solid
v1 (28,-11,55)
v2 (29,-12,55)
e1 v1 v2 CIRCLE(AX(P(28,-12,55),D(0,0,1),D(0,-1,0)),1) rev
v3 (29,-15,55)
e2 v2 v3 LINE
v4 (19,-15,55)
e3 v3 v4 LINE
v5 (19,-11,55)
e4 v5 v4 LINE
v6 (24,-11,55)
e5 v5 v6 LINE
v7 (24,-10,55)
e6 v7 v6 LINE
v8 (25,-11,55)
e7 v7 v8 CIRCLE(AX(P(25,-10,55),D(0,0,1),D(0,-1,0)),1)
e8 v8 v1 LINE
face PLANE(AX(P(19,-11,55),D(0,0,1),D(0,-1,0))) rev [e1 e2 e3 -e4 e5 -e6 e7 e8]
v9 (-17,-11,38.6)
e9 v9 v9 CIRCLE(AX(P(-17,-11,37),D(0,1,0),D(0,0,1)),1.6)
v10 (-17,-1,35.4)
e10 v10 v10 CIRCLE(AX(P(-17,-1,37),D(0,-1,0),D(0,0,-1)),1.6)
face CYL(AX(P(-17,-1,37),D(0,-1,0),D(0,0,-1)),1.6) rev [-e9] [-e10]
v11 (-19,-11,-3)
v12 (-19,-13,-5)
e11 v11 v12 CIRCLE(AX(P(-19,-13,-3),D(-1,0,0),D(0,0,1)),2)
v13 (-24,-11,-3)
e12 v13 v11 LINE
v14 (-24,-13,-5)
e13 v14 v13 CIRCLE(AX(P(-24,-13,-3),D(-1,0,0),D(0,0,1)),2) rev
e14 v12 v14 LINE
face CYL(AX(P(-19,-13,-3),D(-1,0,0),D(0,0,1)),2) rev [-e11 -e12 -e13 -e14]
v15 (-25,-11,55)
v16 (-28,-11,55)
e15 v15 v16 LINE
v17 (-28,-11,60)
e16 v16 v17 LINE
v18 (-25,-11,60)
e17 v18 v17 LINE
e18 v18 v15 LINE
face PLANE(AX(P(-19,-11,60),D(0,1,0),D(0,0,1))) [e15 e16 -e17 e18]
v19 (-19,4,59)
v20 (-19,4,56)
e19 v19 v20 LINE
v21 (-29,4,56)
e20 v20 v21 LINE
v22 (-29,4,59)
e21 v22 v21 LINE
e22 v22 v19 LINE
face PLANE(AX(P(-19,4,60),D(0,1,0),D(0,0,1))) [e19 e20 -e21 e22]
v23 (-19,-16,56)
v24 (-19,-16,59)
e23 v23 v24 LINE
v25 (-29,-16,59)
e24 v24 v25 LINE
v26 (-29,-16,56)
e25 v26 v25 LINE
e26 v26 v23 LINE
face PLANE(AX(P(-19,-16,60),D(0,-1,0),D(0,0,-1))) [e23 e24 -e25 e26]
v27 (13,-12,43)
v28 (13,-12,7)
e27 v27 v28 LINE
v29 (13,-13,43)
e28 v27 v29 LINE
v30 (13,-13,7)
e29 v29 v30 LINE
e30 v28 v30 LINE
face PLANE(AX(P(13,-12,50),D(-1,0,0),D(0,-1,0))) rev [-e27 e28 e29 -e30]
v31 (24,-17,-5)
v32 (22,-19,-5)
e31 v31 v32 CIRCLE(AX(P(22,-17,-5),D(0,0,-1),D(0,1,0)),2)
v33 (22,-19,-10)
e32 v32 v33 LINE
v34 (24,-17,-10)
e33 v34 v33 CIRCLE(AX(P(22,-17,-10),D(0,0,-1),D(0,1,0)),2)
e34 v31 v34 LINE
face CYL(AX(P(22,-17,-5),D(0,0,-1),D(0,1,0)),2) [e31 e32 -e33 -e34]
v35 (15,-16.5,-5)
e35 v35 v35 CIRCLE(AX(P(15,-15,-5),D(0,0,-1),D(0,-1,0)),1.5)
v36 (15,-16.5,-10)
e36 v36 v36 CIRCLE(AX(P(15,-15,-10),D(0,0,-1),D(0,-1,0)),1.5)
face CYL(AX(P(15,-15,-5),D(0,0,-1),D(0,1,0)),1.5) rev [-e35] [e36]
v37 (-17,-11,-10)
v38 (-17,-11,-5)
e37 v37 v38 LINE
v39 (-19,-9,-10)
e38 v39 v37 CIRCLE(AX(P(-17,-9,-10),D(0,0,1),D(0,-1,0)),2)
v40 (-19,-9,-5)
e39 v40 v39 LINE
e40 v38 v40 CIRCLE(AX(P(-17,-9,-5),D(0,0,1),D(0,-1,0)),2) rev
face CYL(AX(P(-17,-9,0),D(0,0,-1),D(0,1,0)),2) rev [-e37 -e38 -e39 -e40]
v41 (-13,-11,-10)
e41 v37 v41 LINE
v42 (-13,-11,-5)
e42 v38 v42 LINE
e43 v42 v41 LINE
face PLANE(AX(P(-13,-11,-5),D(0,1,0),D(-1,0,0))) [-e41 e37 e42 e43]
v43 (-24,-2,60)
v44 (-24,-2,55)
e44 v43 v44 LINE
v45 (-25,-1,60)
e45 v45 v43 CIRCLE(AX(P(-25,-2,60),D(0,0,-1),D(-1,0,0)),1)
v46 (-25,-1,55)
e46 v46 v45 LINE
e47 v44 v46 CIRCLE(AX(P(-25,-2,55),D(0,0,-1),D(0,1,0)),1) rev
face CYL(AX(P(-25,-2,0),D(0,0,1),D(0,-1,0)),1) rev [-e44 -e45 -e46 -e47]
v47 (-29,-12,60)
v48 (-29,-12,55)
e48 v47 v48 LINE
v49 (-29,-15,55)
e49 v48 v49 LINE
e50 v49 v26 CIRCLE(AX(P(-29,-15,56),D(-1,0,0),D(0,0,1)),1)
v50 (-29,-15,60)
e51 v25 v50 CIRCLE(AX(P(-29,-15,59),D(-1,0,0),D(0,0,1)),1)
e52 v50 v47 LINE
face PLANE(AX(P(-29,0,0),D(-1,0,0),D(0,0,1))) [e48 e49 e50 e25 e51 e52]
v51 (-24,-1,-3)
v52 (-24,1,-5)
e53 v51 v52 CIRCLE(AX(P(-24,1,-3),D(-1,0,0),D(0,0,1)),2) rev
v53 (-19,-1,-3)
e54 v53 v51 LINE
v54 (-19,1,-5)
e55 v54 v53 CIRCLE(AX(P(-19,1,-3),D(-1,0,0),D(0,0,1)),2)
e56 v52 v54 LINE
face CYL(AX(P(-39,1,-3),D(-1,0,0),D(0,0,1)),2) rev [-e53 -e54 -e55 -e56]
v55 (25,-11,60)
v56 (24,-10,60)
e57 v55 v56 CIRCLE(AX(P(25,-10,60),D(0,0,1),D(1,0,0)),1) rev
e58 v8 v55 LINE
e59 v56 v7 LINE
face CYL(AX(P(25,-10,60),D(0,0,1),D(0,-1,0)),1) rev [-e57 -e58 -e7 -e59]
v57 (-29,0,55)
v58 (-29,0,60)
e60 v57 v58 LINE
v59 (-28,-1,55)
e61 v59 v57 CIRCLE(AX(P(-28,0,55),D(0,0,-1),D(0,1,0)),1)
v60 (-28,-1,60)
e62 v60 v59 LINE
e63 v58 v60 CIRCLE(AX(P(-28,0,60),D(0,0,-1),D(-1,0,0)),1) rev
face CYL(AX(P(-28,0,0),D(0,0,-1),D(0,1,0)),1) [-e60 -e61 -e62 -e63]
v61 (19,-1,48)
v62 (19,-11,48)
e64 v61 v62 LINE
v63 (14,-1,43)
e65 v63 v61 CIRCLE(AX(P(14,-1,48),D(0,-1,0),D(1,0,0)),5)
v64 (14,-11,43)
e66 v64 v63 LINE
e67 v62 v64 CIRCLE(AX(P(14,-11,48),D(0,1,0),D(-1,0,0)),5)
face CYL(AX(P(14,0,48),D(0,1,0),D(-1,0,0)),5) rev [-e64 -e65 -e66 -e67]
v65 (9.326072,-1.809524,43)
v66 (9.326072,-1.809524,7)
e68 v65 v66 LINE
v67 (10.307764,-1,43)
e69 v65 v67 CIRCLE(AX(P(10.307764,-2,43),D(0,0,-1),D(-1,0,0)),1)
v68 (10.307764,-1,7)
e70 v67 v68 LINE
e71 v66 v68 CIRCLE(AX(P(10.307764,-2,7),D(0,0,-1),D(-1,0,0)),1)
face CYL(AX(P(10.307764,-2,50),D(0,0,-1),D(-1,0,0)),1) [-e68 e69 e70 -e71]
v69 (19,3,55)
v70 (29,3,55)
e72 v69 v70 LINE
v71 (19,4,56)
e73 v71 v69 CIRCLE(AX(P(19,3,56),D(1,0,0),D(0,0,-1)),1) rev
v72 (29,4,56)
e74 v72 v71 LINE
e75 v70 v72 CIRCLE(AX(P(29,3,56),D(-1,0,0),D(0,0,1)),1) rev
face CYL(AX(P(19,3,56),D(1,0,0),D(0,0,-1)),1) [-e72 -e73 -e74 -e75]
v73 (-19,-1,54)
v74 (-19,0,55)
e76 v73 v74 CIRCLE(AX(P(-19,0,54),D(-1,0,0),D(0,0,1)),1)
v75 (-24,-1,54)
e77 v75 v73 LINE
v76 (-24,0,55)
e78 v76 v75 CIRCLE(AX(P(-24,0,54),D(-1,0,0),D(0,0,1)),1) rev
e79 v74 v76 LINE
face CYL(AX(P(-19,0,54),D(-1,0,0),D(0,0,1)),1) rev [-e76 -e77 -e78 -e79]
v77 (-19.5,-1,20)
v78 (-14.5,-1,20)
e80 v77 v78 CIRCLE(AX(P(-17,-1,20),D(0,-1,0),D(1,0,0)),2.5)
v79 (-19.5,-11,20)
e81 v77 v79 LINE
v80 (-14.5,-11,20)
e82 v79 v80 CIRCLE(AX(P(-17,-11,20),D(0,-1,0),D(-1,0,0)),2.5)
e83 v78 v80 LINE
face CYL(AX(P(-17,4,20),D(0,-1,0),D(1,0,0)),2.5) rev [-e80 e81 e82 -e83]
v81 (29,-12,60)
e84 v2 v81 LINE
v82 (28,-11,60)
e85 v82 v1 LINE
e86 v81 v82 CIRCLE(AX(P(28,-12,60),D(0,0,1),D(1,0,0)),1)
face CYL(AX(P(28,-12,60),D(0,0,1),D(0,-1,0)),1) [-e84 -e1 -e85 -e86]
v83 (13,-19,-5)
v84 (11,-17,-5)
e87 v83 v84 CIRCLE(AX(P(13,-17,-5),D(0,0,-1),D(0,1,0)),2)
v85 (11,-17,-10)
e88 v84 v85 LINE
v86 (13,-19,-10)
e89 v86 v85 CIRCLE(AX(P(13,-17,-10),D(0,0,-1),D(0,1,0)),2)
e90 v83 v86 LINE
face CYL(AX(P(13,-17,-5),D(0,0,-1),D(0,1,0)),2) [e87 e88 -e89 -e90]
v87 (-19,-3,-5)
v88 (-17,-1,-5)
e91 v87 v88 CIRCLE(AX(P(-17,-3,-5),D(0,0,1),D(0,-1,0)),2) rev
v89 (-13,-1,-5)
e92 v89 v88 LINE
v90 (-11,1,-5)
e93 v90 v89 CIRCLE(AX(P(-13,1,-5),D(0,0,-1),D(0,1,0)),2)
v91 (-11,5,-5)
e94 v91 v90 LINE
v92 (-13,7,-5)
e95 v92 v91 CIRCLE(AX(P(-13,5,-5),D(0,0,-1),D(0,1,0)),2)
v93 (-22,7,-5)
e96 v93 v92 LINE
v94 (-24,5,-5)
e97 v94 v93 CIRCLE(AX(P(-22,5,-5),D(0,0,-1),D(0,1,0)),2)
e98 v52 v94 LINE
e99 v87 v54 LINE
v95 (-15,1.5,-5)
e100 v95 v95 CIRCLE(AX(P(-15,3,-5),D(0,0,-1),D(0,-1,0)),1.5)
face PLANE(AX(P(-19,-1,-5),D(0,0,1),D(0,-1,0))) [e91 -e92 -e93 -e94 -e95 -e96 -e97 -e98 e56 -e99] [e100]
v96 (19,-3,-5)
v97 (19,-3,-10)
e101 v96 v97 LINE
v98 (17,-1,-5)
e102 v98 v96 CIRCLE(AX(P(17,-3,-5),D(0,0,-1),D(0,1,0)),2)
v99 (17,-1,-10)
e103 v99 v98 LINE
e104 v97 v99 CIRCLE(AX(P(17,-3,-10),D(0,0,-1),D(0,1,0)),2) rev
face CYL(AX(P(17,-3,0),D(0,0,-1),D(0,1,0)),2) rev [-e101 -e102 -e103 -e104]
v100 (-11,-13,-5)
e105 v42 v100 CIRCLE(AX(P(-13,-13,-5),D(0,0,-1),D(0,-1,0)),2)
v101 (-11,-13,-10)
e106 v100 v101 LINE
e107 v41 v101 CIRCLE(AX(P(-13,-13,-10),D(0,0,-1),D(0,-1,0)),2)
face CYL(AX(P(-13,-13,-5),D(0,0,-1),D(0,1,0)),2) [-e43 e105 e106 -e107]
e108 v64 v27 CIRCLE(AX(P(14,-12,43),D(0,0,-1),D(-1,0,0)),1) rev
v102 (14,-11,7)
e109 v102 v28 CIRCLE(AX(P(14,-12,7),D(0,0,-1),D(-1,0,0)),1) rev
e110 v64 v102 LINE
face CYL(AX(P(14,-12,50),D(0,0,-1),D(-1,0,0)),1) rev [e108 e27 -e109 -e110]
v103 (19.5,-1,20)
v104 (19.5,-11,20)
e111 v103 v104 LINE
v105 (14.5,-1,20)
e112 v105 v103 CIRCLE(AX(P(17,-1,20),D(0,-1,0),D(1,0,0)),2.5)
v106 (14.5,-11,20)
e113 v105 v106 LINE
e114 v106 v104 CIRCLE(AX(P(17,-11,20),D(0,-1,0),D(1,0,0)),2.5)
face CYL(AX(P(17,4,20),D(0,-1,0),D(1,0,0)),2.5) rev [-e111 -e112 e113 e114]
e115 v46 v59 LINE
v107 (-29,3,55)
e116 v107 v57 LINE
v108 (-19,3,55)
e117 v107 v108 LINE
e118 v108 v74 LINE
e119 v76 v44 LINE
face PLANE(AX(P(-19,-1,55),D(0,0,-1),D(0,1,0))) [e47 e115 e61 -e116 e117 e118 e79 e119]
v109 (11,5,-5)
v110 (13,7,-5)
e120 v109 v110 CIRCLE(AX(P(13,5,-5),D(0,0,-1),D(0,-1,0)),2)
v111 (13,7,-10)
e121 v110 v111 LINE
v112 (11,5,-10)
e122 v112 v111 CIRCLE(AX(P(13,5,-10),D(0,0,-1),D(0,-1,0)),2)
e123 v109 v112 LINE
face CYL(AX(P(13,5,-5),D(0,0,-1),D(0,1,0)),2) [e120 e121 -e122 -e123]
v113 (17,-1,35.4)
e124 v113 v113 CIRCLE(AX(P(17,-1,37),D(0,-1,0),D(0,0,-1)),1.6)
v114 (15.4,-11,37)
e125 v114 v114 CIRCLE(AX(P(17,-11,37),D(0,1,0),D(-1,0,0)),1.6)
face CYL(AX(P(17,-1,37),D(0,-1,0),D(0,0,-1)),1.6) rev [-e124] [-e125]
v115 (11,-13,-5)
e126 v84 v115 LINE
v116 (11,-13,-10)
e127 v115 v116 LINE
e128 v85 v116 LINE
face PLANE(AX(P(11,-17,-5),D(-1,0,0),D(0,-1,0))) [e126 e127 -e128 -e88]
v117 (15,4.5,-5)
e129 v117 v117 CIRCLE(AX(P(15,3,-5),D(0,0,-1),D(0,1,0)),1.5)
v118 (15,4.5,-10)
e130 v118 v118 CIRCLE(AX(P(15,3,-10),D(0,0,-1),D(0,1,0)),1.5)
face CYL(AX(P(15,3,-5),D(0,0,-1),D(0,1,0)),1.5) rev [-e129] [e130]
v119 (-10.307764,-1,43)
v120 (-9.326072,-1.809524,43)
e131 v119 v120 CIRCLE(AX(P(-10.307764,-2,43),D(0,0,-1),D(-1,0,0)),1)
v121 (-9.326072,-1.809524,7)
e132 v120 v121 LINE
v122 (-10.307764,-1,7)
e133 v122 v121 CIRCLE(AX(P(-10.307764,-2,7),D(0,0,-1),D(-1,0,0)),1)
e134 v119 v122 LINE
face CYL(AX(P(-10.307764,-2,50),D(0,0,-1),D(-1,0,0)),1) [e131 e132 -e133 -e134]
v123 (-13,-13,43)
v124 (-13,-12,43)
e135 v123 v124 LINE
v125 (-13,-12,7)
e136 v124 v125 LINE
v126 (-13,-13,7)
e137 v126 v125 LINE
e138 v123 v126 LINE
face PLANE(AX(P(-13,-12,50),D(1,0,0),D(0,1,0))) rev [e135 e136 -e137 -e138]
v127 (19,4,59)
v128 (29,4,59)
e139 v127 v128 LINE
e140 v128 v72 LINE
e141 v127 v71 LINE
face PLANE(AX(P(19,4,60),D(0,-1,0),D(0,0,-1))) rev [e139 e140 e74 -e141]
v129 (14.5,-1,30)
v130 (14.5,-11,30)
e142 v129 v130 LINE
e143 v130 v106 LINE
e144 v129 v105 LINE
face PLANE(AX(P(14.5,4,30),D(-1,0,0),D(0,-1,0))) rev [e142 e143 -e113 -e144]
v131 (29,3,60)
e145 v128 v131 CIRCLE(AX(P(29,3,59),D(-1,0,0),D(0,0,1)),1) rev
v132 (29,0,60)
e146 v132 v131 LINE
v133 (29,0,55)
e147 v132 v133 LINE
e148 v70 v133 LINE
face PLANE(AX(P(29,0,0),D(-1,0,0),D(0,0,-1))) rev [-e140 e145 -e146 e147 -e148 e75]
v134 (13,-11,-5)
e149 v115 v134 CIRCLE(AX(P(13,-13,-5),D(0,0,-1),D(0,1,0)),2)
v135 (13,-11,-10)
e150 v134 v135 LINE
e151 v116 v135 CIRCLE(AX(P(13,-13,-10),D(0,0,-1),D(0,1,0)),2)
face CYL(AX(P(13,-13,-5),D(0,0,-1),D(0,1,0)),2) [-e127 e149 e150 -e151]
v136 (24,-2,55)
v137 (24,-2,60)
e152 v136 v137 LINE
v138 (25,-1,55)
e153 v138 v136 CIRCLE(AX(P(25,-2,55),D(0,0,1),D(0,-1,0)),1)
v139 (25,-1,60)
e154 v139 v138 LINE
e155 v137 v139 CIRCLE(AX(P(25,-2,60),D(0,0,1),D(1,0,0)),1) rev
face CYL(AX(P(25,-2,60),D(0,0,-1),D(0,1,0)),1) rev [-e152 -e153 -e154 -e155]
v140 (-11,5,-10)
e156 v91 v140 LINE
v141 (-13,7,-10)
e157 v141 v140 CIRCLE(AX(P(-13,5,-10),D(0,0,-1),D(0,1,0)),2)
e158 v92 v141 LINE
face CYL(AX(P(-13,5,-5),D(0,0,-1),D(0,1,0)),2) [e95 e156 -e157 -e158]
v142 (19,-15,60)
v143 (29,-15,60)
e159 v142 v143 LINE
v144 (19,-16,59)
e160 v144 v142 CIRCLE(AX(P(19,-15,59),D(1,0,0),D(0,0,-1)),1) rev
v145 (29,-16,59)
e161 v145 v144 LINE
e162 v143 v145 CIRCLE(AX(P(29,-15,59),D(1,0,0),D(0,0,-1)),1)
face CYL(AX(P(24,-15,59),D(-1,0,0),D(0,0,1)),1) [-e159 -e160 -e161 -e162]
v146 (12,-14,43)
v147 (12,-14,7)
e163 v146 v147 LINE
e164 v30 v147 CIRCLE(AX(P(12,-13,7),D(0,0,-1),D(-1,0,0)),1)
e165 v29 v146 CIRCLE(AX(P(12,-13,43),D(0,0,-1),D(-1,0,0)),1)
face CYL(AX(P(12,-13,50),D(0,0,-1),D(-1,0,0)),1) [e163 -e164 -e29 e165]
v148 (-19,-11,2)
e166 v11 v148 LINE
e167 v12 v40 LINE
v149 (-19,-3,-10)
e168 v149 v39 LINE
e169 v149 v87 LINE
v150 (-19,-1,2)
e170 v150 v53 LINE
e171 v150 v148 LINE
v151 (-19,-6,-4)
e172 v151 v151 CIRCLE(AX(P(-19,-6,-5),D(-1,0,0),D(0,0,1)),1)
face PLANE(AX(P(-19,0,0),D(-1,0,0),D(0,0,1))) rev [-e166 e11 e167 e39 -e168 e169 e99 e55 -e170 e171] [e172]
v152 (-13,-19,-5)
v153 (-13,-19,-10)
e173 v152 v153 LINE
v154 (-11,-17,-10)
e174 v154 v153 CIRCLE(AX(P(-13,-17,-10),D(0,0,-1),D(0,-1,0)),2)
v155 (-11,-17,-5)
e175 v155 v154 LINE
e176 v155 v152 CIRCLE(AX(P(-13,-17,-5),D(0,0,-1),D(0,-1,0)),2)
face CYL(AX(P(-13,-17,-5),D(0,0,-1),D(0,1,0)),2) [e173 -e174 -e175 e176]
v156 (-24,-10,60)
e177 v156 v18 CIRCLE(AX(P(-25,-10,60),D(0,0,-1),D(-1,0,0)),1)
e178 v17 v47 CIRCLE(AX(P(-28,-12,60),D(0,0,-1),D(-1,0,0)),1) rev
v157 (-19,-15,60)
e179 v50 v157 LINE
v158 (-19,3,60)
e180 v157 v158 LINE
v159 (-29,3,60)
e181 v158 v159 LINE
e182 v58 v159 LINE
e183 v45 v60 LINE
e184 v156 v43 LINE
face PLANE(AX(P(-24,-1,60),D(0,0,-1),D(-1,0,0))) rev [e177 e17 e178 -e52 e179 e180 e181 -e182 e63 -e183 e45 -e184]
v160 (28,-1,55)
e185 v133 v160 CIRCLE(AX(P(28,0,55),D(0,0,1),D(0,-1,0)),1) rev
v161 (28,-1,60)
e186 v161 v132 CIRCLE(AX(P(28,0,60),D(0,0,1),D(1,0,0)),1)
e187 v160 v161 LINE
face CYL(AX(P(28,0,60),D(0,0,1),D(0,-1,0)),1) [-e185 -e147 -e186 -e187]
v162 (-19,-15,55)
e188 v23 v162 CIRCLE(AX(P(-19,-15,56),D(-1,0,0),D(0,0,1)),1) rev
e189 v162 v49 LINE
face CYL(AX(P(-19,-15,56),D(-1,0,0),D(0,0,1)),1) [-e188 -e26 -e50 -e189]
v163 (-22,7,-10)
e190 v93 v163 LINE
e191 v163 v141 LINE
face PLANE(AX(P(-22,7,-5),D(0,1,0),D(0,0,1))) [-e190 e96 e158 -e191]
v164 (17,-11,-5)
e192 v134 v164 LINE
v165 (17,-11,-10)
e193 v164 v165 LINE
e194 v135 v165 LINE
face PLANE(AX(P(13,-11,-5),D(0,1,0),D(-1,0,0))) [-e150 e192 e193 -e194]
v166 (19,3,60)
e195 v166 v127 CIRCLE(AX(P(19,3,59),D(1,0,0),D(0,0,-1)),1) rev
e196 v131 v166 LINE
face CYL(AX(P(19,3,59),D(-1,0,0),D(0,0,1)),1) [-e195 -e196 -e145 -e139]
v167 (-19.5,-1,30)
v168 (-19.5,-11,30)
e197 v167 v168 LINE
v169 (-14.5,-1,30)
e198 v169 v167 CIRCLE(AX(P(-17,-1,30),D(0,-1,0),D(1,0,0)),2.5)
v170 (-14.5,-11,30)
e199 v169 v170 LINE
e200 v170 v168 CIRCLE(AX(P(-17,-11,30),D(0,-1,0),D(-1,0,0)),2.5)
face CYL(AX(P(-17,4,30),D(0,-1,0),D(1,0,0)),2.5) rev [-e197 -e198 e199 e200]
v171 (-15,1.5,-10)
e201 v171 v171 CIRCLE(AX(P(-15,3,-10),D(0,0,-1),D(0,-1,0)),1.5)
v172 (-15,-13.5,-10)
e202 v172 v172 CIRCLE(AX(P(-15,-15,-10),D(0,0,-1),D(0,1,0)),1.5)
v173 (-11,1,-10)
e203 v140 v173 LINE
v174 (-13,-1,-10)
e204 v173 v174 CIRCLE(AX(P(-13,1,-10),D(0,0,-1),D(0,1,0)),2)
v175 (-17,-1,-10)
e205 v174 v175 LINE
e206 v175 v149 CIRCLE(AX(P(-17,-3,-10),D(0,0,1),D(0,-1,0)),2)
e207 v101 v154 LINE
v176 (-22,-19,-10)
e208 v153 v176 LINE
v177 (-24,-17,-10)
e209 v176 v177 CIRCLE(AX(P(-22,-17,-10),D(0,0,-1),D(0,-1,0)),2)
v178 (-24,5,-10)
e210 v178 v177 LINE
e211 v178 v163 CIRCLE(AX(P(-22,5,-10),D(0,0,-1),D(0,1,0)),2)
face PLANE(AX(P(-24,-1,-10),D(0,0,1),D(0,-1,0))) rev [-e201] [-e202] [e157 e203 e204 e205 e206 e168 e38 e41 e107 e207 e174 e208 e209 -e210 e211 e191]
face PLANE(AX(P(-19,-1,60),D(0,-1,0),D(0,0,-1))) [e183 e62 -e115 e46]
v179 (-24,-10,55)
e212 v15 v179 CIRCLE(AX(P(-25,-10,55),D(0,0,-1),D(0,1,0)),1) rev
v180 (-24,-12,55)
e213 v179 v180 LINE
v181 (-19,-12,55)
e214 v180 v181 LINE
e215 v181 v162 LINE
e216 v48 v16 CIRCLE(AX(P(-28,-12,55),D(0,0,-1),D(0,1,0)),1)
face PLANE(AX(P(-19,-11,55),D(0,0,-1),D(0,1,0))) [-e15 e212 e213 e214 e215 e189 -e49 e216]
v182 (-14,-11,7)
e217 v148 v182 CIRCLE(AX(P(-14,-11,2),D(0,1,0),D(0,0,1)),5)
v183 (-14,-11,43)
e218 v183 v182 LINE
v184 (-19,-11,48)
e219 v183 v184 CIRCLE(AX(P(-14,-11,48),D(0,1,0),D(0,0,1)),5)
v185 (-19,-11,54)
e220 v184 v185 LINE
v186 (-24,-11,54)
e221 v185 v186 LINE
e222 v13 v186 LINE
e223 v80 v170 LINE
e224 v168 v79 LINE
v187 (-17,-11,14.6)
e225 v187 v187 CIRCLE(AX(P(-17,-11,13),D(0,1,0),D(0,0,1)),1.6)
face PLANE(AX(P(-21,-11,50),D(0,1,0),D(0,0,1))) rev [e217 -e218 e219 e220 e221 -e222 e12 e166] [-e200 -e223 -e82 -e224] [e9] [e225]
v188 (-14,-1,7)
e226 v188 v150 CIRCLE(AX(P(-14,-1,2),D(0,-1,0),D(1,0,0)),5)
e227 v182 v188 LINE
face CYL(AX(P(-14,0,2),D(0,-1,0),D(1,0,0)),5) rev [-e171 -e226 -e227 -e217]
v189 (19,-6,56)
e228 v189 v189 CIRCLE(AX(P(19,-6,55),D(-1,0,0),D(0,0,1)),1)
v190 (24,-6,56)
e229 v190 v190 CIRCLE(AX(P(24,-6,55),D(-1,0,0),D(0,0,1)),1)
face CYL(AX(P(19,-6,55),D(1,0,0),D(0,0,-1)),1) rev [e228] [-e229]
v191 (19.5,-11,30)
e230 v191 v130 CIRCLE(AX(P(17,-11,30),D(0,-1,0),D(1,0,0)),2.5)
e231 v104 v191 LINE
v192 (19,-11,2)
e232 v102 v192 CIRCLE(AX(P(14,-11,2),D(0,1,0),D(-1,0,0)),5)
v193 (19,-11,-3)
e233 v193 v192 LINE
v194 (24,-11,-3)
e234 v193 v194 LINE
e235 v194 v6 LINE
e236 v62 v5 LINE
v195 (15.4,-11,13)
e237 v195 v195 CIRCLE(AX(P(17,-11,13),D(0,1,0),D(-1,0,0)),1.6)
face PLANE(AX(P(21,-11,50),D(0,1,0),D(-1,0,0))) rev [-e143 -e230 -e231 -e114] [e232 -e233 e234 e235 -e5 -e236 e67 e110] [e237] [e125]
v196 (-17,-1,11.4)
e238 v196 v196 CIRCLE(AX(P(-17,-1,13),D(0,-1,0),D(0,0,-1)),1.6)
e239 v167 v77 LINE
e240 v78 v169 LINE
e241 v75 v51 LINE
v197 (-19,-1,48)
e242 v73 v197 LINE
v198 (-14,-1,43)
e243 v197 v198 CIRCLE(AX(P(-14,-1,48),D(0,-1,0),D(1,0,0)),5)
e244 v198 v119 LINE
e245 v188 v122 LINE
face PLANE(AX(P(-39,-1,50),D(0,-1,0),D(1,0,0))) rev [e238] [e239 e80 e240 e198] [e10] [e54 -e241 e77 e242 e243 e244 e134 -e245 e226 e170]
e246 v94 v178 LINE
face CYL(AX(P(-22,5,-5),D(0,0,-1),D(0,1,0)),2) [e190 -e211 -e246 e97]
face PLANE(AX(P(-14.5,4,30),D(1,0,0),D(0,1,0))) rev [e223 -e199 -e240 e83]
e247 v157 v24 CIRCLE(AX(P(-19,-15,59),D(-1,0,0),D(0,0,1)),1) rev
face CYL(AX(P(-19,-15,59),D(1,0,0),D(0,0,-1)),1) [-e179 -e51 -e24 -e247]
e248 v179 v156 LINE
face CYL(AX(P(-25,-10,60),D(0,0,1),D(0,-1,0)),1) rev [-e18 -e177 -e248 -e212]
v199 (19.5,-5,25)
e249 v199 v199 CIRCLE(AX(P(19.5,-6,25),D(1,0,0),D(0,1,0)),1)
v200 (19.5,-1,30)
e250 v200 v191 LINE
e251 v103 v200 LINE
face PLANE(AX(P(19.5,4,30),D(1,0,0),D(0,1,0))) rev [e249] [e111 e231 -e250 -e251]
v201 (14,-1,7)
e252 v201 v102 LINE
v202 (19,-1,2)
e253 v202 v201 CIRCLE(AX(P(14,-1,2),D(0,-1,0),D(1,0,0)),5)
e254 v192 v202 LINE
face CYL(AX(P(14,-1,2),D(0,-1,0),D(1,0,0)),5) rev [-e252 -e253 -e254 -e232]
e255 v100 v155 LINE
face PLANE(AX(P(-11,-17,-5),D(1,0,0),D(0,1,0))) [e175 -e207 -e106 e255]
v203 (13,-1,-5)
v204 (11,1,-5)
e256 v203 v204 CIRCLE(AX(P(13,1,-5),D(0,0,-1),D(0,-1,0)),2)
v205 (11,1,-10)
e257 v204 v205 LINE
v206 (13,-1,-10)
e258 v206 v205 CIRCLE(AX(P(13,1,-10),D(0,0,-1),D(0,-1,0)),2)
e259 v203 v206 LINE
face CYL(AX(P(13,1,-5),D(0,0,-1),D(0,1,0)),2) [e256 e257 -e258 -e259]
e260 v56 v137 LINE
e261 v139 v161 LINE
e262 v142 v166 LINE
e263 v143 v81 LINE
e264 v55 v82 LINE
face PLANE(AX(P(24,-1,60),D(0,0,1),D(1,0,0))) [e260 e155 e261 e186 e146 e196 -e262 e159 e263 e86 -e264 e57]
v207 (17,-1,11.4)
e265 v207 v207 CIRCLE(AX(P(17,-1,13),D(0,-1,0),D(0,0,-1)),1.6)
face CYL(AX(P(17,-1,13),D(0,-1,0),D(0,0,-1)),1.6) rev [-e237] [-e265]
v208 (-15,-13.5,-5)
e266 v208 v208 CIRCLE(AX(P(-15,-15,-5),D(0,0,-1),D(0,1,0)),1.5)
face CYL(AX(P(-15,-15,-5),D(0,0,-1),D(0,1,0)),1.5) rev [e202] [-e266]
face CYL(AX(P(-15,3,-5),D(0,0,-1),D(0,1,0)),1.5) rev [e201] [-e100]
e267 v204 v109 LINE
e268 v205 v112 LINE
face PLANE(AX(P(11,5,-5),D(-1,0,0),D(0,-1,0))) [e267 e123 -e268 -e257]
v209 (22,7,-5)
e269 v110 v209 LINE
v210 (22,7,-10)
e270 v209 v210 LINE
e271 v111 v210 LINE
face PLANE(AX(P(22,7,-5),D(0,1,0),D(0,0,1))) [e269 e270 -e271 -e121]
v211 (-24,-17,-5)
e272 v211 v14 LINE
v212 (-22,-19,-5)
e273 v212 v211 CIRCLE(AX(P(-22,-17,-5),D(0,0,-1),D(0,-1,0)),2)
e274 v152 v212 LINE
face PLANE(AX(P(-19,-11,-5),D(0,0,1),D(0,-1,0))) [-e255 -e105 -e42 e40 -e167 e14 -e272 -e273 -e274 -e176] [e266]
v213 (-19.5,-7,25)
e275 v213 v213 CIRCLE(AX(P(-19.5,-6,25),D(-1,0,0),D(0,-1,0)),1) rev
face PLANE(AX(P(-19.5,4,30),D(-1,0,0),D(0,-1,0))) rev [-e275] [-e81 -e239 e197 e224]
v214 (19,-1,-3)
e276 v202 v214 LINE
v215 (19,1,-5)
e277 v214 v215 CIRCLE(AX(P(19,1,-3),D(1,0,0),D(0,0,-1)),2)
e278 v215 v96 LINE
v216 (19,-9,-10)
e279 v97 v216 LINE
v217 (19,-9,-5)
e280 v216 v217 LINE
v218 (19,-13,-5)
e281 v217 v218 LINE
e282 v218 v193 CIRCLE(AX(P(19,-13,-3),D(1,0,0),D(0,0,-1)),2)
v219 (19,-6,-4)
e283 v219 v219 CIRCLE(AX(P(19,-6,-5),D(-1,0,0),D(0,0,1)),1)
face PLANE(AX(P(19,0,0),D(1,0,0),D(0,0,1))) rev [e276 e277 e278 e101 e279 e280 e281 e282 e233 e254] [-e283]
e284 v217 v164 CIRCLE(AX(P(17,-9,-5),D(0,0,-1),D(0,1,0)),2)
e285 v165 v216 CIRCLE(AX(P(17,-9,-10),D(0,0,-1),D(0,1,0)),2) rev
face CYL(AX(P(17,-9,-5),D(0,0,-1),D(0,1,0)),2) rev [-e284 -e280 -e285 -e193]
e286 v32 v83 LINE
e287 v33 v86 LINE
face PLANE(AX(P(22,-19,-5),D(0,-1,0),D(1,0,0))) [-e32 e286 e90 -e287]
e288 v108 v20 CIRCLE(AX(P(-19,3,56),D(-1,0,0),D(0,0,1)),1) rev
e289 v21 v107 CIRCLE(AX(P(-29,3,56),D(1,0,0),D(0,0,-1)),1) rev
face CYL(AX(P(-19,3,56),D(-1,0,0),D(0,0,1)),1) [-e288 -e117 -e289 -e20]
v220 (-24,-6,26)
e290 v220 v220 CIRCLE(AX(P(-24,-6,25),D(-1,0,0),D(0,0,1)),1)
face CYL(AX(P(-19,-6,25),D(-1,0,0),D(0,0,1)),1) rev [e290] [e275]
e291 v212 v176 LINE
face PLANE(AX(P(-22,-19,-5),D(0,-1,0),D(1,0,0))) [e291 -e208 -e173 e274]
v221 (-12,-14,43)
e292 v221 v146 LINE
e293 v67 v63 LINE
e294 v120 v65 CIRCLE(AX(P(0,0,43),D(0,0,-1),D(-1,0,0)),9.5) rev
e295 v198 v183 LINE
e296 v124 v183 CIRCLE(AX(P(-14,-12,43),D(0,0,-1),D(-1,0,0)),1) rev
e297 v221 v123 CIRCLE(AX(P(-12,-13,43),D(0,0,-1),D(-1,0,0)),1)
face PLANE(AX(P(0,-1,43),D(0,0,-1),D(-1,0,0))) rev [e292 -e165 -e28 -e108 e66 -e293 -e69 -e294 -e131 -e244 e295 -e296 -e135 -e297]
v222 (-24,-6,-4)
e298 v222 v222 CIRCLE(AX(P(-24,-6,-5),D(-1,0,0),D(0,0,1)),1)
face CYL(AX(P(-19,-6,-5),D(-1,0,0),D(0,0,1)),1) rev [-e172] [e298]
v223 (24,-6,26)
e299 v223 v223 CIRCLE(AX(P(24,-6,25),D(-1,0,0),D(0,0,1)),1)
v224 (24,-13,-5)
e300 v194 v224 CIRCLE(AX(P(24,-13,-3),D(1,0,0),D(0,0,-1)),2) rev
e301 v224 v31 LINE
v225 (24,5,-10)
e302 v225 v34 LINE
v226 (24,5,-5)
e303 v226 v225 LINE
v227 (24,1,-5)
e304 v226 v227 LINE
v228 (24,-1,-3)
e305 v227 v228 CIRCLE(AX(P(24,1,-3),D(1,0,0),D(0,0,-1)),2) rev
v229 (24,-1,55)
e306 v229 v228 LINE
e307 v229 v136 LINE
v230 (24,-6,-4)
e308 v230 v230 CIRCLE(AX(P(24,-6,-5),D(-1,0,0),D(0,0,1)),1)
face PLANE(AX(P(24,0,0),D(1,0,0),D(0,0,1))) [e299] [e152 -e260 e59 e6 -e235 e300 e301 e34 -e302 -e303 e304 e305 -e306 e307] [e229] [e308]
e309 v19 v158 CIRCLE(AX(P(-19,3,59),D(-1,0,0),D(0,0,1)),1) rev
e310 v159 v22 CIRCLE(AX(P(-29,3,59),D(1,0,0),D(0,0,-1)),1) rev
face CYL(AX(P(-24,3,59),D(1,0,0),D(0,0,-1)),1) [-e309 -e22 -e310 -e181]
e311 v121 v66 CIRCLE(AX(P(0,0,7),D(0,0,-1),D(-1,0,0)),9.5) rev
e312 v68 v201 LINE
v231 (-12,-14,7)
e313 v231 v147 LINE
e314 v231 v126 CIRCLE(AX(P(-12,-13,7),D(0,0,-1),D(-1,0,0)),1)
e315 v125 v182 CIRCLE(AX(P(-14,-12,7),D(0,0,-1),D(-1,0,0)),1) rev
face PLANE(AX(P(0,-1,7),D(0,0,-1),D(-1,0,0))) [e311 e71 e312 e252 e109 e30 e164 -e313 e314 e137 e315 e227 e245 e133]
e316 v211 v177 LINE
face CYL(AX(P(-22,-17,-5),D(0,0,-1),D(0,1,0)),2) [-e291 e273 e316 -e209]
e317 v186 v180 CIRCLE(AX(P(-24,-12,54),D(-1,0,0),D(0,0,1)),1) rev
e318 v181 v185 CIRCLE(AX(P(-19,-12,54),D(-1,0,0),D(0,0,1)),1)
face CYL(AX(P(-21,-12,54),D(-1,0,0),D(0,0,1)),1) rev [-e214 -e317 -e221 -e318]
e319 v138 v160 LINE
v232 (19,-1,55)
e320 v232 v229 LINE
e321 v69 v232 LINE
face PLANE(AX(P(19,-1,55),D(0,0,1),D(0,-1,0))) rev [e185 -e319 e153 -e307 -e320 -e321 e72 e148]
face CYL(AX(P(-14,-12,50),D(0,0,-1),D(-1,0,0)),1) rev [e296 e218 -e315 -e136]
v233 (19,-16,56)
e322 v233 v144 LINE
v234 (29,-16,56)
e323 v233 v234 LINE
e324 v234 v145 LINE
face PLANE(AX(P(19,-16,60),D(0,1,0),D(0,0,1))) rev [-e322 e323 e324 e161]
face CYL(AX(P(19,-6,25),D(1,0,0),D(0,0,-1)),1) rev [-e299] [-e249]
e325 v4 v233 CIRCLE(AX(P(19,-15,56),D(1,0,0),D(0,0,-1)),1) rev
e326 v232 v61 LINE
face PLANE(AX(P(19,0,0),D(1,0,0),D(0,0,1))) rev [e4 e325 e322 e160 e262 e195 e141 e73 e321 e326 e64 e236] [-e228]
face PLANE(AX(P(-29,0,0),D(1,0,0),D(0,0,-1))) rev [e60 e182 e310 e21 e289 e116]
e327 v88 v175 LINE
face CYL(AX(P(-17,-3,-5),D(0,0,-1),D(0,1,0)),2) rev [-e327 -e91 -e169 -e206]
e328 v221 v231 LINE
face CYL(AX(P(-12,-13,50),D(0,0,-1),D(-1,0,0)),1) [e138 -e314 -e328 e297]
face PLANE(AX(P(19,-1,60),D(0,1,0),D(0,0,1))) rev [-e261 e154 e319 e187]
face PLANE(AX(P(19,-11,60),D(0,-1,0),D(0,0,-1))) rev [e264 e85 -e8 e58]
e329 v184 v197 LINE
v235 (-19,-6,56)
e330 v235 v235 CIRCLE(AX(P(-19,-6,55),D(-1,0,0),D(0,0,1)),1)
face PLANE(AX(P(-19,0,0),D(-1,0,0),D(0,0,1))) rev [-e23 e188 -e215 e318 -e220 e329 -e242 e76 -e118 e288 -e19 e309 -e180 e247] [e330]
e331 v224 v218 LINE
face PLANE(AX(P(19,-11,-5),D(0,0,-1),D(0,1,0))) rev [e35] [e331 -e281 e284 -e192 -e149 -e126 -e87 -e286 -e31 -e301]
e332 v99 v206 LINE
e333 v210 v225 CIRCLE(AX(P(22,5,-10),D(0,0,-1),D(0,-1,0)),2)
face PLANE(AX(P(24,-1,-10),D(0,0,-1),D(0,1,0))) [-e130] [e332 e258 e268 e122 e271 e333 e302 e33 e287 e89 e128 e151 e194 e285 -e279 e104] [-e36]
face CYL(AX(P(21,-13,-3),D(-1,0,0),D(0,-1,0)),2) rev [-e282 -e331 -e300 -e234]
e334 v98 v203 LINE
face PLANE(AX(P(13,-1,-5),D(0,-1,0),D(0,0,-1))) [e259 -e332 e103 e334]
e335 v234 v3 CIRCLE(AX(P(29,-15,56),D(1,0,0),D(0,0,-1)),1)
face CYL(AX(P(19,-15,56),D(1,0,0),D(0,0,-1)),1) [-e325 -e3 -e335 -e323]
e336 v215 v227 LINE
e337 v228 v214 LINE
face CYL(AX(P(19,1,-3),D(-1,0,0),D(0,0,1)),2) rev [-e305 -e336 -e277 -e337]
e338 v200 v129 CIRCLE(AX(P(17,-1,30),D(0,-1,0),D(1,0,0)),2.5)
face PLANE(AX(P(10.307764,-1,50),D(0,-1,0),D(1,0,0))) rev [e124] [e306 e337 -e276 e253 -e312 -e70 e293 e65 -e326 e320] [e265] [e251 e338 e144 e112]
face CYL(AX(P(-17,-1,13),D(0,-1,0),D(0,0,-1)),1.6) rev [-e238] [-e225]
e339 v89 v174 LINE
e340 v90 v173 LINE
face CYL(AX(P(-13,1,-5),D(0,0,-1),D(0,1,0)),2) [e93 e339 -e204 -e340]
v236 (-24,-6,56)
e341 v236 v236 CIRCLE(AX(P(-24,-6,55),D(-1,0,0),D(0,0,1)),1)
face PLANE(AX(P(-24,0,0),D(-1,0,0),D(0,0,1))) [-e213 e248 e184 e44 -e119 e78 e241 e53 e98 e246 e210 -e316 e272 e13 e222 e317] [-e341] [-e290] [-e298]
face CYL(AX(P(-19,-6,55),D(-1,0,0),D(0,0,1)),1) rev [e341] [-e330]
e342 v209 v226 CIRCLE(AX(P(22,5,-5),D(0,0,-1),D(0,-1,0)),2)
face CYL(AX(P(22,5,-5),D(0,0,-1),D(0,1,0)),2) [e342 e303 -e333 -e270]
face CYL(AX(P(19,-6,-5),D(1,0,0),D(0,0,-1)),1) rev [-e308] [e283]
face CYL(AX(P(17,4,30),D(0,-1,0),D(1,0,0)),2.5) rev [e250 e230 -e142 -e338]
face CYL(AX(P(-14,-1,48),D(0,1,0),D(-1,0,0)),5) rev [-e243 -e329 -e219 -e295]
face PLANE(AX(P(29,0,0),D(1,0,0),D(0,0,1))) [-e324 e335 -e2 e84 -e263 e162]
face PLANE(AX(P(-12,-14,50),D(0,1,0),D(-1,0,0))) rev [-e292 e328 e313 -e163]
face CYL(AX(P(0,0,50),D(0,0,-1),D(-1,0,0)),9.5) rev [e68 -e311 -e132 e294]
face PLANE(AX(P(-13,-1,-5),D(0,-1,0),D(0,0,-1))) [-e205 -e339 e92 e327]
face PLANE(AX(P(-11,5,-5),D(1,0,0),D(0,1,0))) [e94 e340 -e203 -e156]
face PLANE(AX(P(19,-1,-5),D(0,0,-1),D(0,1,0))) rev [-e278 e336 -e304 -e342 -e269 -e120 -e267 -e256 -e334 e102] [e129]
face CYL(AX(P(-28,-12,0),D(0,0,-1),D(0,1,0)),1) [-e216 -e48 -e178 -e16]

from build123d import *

# Parameters (mm, degrees)
EXTRUDE_1_DEPTH          = 50
CUT_EXTRUDE_1_DEPTH      = 65.195015383
CUT_EXTRUDE_1_DEPTH_BACK = 65.195015383
SKETCH_2_R               = 1.6
SKETCH_2_R_2             = 1.1
CUT_EXTRUDE_4_DEPTH      = 64.914004725
CUT_EXTRUDE_4_DEPTH_BACK = 64.914004725
SKETCH_8_W               = 61
SKETCH_8_H               = 50
SKETCH_8_W_2             = 38
SKETCH_8_H_2             = 36
SKETCH_8_W_3             = 17
SKETCH_8_R               = 1.1
SKETCH_9_W               = 70
SKETCH_9_H               = 10
EXTRUDE_2_DEPTH          = 5
SKETCH_10_R              = 1
CUT_EXTRUDE_5_DEPTH      = 5
SKETCH_11_W              = 5
SKETCH_11_H              = 5
EXTRUDE_3_DEPTH          = 5
FILLET_7_R               = 1
FILLET_8_R               = 1
FILLET_10_R              = 5
MIRROR_START             = 19
MIRROR_1_OUTLINE_R       = 1
MIRROR_1_DEPTH           = 5
MIRROR_START_2           = 24
MIRROR_1_2_OUTLINE_W     = 5
MIRROR_1_2_OUTLINE_H     = 5
MIRROR_1_2_DEPTH         = 4
MIRROR_START_3           = 25
MIRROR_1_3_OUTLINE_W     = 5
MIRROR_1_3_OUTLINE_H     = 5
MIRROR_1_3_DEPTH         = 4
MIRROR_START_4           = 55
MIRROR_1_4_DEPTH         = 5
MIRROR_START_5           = -11
MIRROR_1_5_DEPTH         = 10
MIRROR_START_6           = 28
MIRROR_1_6_DEPTH         = 2
CUT_EXTRUDE_7_DEPTH      = 15
SKETCH_15_R              = 1.5
EXTRUDE_4_DEPTH          = 5
FILLET_11_R              = 2
FILLET_12_R              = 2
SKETCH_16_W              = 8.633126958
SKETCH_16_H              = 25.605085421
SKETCH_16_W_2            = 10.767561134
SKETCH_16_H_2            = 22.237422609
CUT_EXTRUDE_8_DEPTH      = 5


with BuildPart() as part:
    # 草图1 → 凸台-拉伸1 (new body)
    with BuildSketch(Plane.XY):
        with BuildLine():
            Line((-39, -1), (-10.307764064, -1))
            ThreePointArc((-10.307764064, -1), (-9.671555054, -1.22848325), (-9.326072248, -1.80952381))
            ThreePointArc((-9.326072248, -1.80952381), (0, -9.5), (9.326072248, -1.80952381))
            ThreePointArc((9.326072248, -1.80952381), (9.671555054, -1.22848325), (10.307764064, -1))
            Line((10.307764064, -1), (39, -1))
            Line((39, -1), (39, -6))
            Line((39, -6), (22, -6))
            ThreePointArc((22, -6), (21.292893219, -6.292893219), (21, -7))
            Line((21, -7), (21, -11))
            Line((21, -11), (14, -11))
            ThreePointArc((14, -11), (13.292893219, -11.292893219), (13, -12))
            Line((13, -12), (13, -13))
            ThreePointArc((13, -13), (12.707106781, -13.707106781), (12, -14))
            Line((12, -14), (-12, -14))
            ThreePointArc((-12, -14), (-12.707106781, -13.707106781), (-13, -13))
            Line((-13, -13), (-13, -12))
            ThreePointArc((-13, -12), (-13.292893219, -11.292893219), (-14, -11))
            Line((-14, -11), (-21, -11))
            Line((-21, -11), (-21, -7))
            ThreePointArc((-21, -7), (-21.292893219, -6.292893219), (-22, -6))
            Line((-22, -6), (-39, -6))
            Line((-39, -6), (-39, -1))
        make_face()
    extrude(amount=EXTRUDE_1_DEPTH)

    # 草图2 → 切除-拉伸1 (cut, two sides: drawn at the far end of the back side and taken through both)
    with BuildSketch(Plane.XZ.offset(11).offset(-CUT_EXTRUDE_1_DEPTH_BACK)):
        with Locations(Location((-17, 37, 0), (0, 0, 270))):
            Circle(SKETCH_2_R)
        with Locations(Location((17, 37, 0), (0, 0, 270))):
            Circle(SKETCH_2_R)
        with Locations(Location((17, 13, 0), (0, 0, 270))):
            Circle(SKETCH_2_R)
        with Locations(Location((-17, 13, 0), (0, 0, 270))):
            Circle(SKETCH_2_R)
        with Locations(Location((-36, 43, 0), (0, 0, 270))):
            Circle(SKETCH_2_R_2)
        with Locations(Location((-24, 43, 0), (0, 0, 270))):
            Circle(SKETCH_2_R_2)
        with Locations(Location((-24, 35, 0), (0, 0, 270))):
            Circle(SKETCH_2_R_2)
        with Locations(Location((-36, 35, 0), (0, 0, 270))):
            Circle(SKETCH_2_R_2)
        with Locations(Location((36, 35, 0), (0, 0, 180))):
            Circle(SKETCH_2_R_2)
        with Locations(Location((24, 35, 0), (0, 0, 180))):
            Circle(SKETCH_2_R_2)
        with Locations(Location((24, 43, 0), (0, 0, 180))):
            Circle(SKETCH_2_R_2)
        with Locations(Location((36, 43, 0), (0, 0, 180))):
            Circle(SKETCH_2_R_2)
        with Locations(Location((36, 7, 0), (0, 0, 270))):
            Circle(SKETCH_2_R_2)
        with Locations(Location((24, 7, 0), (0, 0, 270))):
            Circle(SKETCH_2_R_2)
        with Locations(Location((24, 15, 0), (0, 0, 270))):
            Circle(SKETCH_2_R_2)
        with Locations(Location((36, 15, 0), (0, 0, 270))):
            Circle(SKETCH_2_R_2)
        with Locations(Location((-36, 15, 0), (0, 0, 180))):
            Circle(SKETCH_2_R_2)
        with Locations(Location((-24, 15, 0), (0, 0, 180))):
            Circle(SKETCH_2_R_2)
        with Locations(Location((-24, 7, 0), (0, 0, 180))):
            Circle(SKETCH_2_R_2)
        with Locations(Location((-36, 7, 0), (0, 0, 180))):
            Circle(SKETCH_2_R_2)
    extrude(amount=CUT_EXTRUDE_1_DEPTH + CUT_EXTRUDE_1_DEPTH_BACK, mode=Mode.SUBTRACT)

    # 草图8 → 切除-拉伸4 (cut, two sides: drawn at the far end of the back side and taken through both)
    # profile 1 of 2: a face of its own
    with BuildSketch(Plane.XZ.offset(6).offset(-CUT_EXTRUDE_4_DEPTH_BACK)):
        with Locations((8.5, 25)):
            Rectangle(SKETCH_8_W, SKETCH_8_H)
        with Locations((0, 25)):
            Rectangle(SKETCH_8_W_2, SKETCH_8_H_2, mode=Mode.SUBTRACT)
    # profile 2 of 2: a face of its own
    with BuildSketch(Plane.XZ.offset(6).offset(-CUT_EXTRUDE_4_DEPTH_BACK)):
        with Locations((-30.5, 25)):
            Rectangle(SKETCH_8_W_3, SKETCH_8_H)
        with Locations((-36, 43)):
            Circle(SKETCH_8_R, mode=Mode.SUBTRACT)
        with Locations((-24, 35)):
            Circle(SKETCH_8_R, mode=Mode.SUBTRACT)
        with Locations((-24, 15)):
            Circle(SKETCH_8_R, mode=Mode.SUBTRACT)
        with Locations((-36, 7)):
            Circle(SKETCH_8_R, mode=Mode.SUBTRACT)
        with Locations((-24, 7)):
            Circle(SKETCH_8_R, mode=Mode.SUBTRACT)
        with Locations((-24, 43)):
            Circle(SKETCH_8_R, mode=Mode.SUBTRACT)
        with Locations((-36, 35)):
            Circle(SKETCH_8_R, mode=Mode.SUBTRACT)
        with Locations((-36, 15)):
            Circle(SKETCH_8_R, mode=Mode.SUBTRACT)
    extrude(amount=CUT_EXTRUDE_4_DEPTH + CUT_EXTRUDE_4_DEPTH_BACK, mode=Mode.SUBTRACT)

    # 草图9 → 凸台-拉伸2 (add)
    with BuildSketch(Plane.ZY.offset(19)):
        with Locations((25, -6)):
            Rectangle(SKETCH_9_W, SKETCH_9_H)
    extrude(amount=EXTRUDE_2_DEPTH)

    # 草图10 → 切除-拉伸5 (cut)
    with BuildSketch(Plane.ZY.offset(24)):
        with Locations((-5, -6)):
            Circle(SKETCH_10_R)
        with Locations((25, -6)):
            Circle(SKETCH_10_R)
        with Locations((55, -6)):
            Circle(SKETCH_10_R)
    extrude(amount=-CUT_EXTRUDE_5_DEPTH, mode=Mode.SUBTRACT)

    # 草图11 → 凸台-拉伸3 (add, symmetric)
    with BuildSketch(Plane.ZY.offset(24)):
        with Locations((-7.5, 1.5)):
            Rectangle(SKETCH_11_W, SKETCH_11_H)
        with Locations((-7.5, -13.5)):
            Rectangle(SKETCH_11_W, SKETCH_11_H)
        with Locations((57.5, -13.5)):
            Rectangle(SKETCH_11_W, SKETCH_11_H)
        with Locations((57.5, 1.5)):
            Rectangle(SKETCH_11_W, SKETCH_11_H)
    extrude(amount=EXTRUDE_3_DEPTH, both=True)

    # 圆角7
    fillet_7_edges = [part.edges().sort_by_distance(p)[0] for p in [
        (-21.5, -11, 55),
        (-24, -16, 60),
        (-24, -16, 55),
        (-21.5, -1, 55),
        (-24, 4, 55),
        (-24, 4, 60),
    ]]
    fillet(fillet_7_edges, radius=FILLET_7_R)

    # 圆角8
    fillet_8_edges = [part.edges().sort_by_distance(p)[0] for p in [
        (-24, -1, 57.5),
        (-24, -11, 57.5),
        (-29, -11, 57.5),
        (-29, -1, 57.5),
    ]]
    fillet(fillet_8_edges, radius=FILLET_8_R)

    # 圆角10
    fillet_10_edges = [part.edges().sort_by_distance(p)[0] for p in [
        (-19, -6, 43),
        (-19, -6, 7),
    ]]
    fillet(fillet_10_edges, radius=FILLET_10_R)

    # 镜向1: read off the stored shape, not the designer's step
    # 镜向1 outline → 镜向1 (add)
    with BuildSketch(Plane.YZ.offset(MIRROR_START)):
        with BuildLine():
            Line((-1, 55), (3, 55))
            ThreePointArc((3, 55), (3.707106781, 55.292893219), (4, 56))
            Line((4, 56), (4, 59))
            ThreePointArc((4, 59), (3.707106781, 59.707106781), (3, 60))
            Line((3, 60), (-15, 60))
            ThreePointArc((-15, 60), (-15.707106781, 59.707106781), (-16, 59))
            Line((-16, 59), (-16, 56))
            ThreePointArc((-16, 56), (-15.707106781, 55.292893219), (-15, 55))
            Line((-15, 55), (-11, 55))
            Line((-11, 55), (-11, -5))
            Line((-11, -5), (-16, -5))
            Line((-16, -5), (-16, -10))
            Line((-16, -10), (4, -10))
            Line((4, -10), (4, -5))
            Line((4, -5), (-1, -5))
            Line((-1, -5), (-1, 55))
        make_face()
        with Locations((-6, 55)):
            Circle(MIRROR_1_OUTLINE_R, mode=Mode.SUBTRACT)
        with Locations((-6, 25)):
            Circle(MIRROR_1_OUTLINE_R, mode=Mode.SUBTRACT)
        with Locations((-6, -5)):
            Circle(MIRROR_1_OUTLINE_R, mode=Mode.SUBTRACT)
    extrude(amount=MIRROR_1_DEPTH)

    # Mirror 1 2 outline → Mirror 1 2 (add)
    with BuildSketch(Plane.YZ.offset(MIRROR_START_2)):
        with BuildLine():
            Line((-1, 60), (-1, 55))
            Line((-1, 55), (3, 55))
            ThreePointArc((3, 55), (3.707106781, 55.292893219), (4, 56))
            Line((4, 56), (4, 59))
            ThreePointArc((4, 59), (3.707106781, 59.707106781), (3, 60))
            Line((3, 60), (-1, 60))
        make_face()
        with BuildLine():
            Line((-11, 55), (-11, 60))
            Line((-11, 60), (-15, 60))
            ThreePointArc((-15, 60), (-15.707106781, 59.707106781), (-16, 59))
            Line((-16, 59), (-16, 56))
            ThreePointArc((-16, 56), (-15.707106781, 55.292893219), (-15, 55))
            Line((-15, 55), (-11, 55))
        make_face()
        with Locations((1.5, -7.5)):
            Rectangle(MIRROR_1_2_OUTLINE_W, MIRROR_1_2_OUTLINE_H)
        with Locations((-13.5, -7.5)):
            Rectangle(MIRROR_1_2_OUTLINE_W, MIRROR_1_2_OUTLINE_H)
    extrude(amount=MIRROR_1_2_DEPTH)

    # Mirror 1 3 outline → Mirror 1 3 (add)
    with BuildSketch(Plane.YZ.offset(MIRROR_START_3)):
        with Locations((1.5, -7.5)):
            Rectangle(MIRROR_1_3_OUTLINE_W, MIRROR_1_3_OUTLINE_H)
        with Locations((-13.5, -7.5)):
            Rectangle(MIRROR_1_3_OUTLINE_W, MIRROR_1_3_OUTLINE_H)
    extrude(amount=MIRROR_1_3_DEPTH)

    # Mirror 1 4 outline → Mirror 1 4 (add)
    with BuildSketch(Plane.XY.offset(MIRROR_START_4)):
        with BuildLine():
            Line((28, -16), (29, -16))
            Line((29, -16), (29, -12))
            ThreePointArc((29, -12), (28.707106781, -11.292893219), (28, -11))
            Line((28, -11), (28, -16))
        make_face()
        with BuildLine():
            Line((24, -11), (25, -11))
            ThreePointArc((25, -11), (24.292893219, -10.707106781), (24, -10))
            Line((24, -10), (24, -11))
        make_face()
        with BuildLine():
            Line((24, -1), (24, -2))
            ThreePointArc((24, -2), (24.292893219, -1.292893219), (25, -1))
            Line((25, -1), (24, -1))
        make_face()
        with BuildLine():
            Line((29, 4), (28, 4))
            Line((28, 4), (28, -1))
            ThreePointArc((28, -1), (28.707106781, -0.707106781), (29, 0))
            Line((29, 0), (29, 4))
        make_face()
    extrude(amount=MIRROR_1_4_DEPTH)

    # Mirror 1 5 outline → Mirror 1 5 (add)
    with BuildSketch(Plane(origin=(0, 0, 0), x_dir=(1, 0, 0), z_dir=(0, 1, 0)).offset(MIRROR_START_5)):
        with BuildLine():
            ThreePointArc((14, -43), (17.535533906, -44.464466094), (19, -48))
            Line((19, -48), (19, -43))
            Line((19, -43), (14, -43))
        make_face()
        with BuildLine():
            Line((19, -7), (19, -2))
            ThreePointArc((19, -2), (17.535533906, -5.535533906), (14, -7))
            Line((14, -7), (19, -7))
        make_face()
    extrude(amount=MIRROR_1_5_DEPTH)

    # Mirror 1 6 outline → Mirror 1 6 (cut)
    with BuildSketch(Plane.YZ.offset(MIRROR_START_6)):
        with BuildLine():
            Line((4, 55), (4, 56))
            ThreePointArc((4, 56), (3.707106781, 55.292893219), (3, 55))
            Line((3, 55), (4, 55))
        make_face()
        with BuildLine():
            Line((4, 60), (3, 60))
            ThreePointArc((3, 60), (3.707106781, 59.707106781), (4, 59))
            Line((4, 59), (4, 60))
        make_face()
        with BuildLine():
            Line((-16, 60), (-16, 59))
            ThreePointArc((-16, 59), (-15.707106781, 59.707106781), (-15, 60))
            Line((-15, 60), (-16, 60))
        make_face()
        with BuildLine():
            Line((-16, 55), (-15, 55))
            ThreePointArc((-15, 55), (-15.707106781, 55.292893219), (-16, 56))
            Line((-16, 56), (-16, 55))
        make_face()
    extrude(amount=MIRROR_1_6_DEPTH, mode=Mode.SUBTRACT)

    # 草图13 → 切除-拉伸7 (cut)
    with BuildSketch(Plane.XZ.offset(11)):
        with BuildLine():
            Line((19.5, 30), (19.5, 20))
            ThreePointArc((19.5, 20), (17, 17.5), (14.5, 20))
            Line((14.5, 20), (14.5, 30))
            ThreePointArc((14.5, 30), (17, 32.5), (19.5, 30))
        make_face()
        with BuildLine():
            Line((-19.5, 30), (-19.5, 20))
            ThreePointArc((-19.5, 20), (-17, 17.5), (-14.5, 20))
            Line((-14.5, 20), (-14.5, 30))
            ThreePointArc((-14.5, 30), (-17, 32.5), (-19.5, 30))
        make_face()
    extrude(amount=-CUT_EXTRUDE_7_DEPTH, mode=Mode.SUBTRACT)

    # 草图15 → 凸台-拉伸4 (add)
    # profile 1 of 4: a face of its own
    with BuildSketch(Plane(origin=(0, 0, -10), x_dir=(-1, 0, 0), z_dir=(0, 0, -1))):
        with BuildLine():
            Line((-24, 4), (-24, 5))
            ThreePointArc((-24, 5), (-23.414213562, 6.414213562), (-22, 7))
            Line((-22, 7), (-13, 7))
            ThreePointArc((-13, 7), (-11.585786438, 6.414213562), (-11, 5))
            Line((-11, 5), (-11, 1))
            ThreePointArc((-11, 1), (-11.585786438, -0.414213562), (-13, -1))
            Line((-13, -1), (-19, -1))
            Line((-19, -1), (-19, 4))
            Line((-19, 4), (-24, 4))
        make_face()
        with Locations(Location((-15, 3, 0), (0, 0, 90))):
            Circle(SKETCH_15_R, mode=Mode.SUBTRACT)
    # profile 2 of 4: a face of its own
    with BuildSketch(Plane(origin=(0, 0, -10), x_dir=(-1, 0, 0), z_dir=(0, 0, -1))):
        with BuildLine():
            Line((13, -1), (19, -1))
            Line((19, -1), (19, 4))
            Line((19, 4), (24, 4))
            Line((24, 4), (24, 5))
            ThreePointArc((24, 5), (23.414213562, 6.414213562), (22, 7))
            Line((22, 7), (13, 7))
            ThreePointArc((13, 7), (11.585786438, 6.414213562), (11, 5))
            Line((11, 5), (11, 1))
            ThreePointArc((11, 1), (11.585786438, -0.414213562), (13, -1))
        make_face()
        with Locations(Location((15, 3, 0), (0, 0, 270))):
            Circle(SKETCH_15_R, mode=Mode.SUBTRACT)
    # profile 3 of 4: a face of its own
    with BuildSketch(Plane(origin=(0, 0, -10), x_dir=(-1, 0, 0), z_dir=(0, 0, -1))):
        with BuildLine():
            Line((24, -16), (24, -17))
            ThreePointArc((24, -17), (23.414213562, -18.414213562), (22, -19))
            Line((22, -19), (13, -19))
            ThreePointArc((13, -19), (11.585786438, -18.414213562), (11, -17))
            Line((11, -17), (11, -13))
            ThreePointArc((11, -13), (11.585786438, -11.585786438), (13, -11))
            Line((13, -11), (19, -11))
            Line((19, -11), (19, -16))
            Line((19, -16), (24, -16))
        make_face()
        with Locations(Location((15, -15, 0), (0, 0, 90))):
            Circle(SKETCH_15_R, mode=Mode.SUBTRACT)
    # profile 4 of 4: a face of its own
    with BuildSketch(Plane(origin=(0, 0, -10), x_dir=(-1, 0, 0), z_dir=(0, 0, -1))):
        with BuildLine():
            Line((-13, -11), (-19, -11))
            Line((-19, -11), (-19, -16))
            Line((-19, -16), (-24, -16))
            Line((-24, -16), (-24, -17))
            ThreePointArc((-24, -17), (-23.414213562, -18.414213562), (-22, -19))
            Line((-22, -19), (-13, -19))
            ThreePointArc((-13, -19), (-11.585786438, -18.414213562), (-11, -17))
            Line((-11, -17), (-11, -13))
            ThreePointArc((-11, -13), (-11.585786438, -11.585786438), (-13, -11))
        make_face()
        with Locations(Location((-15, -15, 0), (0, 0, 270))):
            Circle(SKETCH_15_R, mode=Mode.SUBTRACT)
    extrude(amount=-EXTRUDE_4_DEPTH)

    # 圆角11
    # the kernel refuses this fillet: 2 mm, written as the material it adds along each edge
    with BuildSketch(Plane(origin=(19, -1, -10), x_dir=(0, -1, 0), z_dir=(0, 0, 1)), Plane(origin=(-19, -11, -10), x_dir=(0, 1, 0), z_dir=(0, 0, 1))) as fillet_11_piece_1:
        with BuildLine():
            CenterArc((FILLET_11_R, -FILLET_11_R), FILLET_11_R, 90, 90)
            Line((0, -FILLET_11_R), (0, 0))
            Line((0, 0), (FILLET_11_R, 0))
        make_face()
    extrude(amount=5)
    with BuildSketch(Plane(origin=(-19, -1, -10), x_dir=(0, -1, 0), z_dir=(0, 0, 1)), Plane(origin=(19, -11, -10), x_dir=(0, 1, 0), z_dir=(0, 0, 1))) as fillet_11_piece_2:
        with BuildLine():
            CenterArc((FILLET_11_R, FILLET_11_R), FILLET_11_R, 180, 90)
            Line((0, FILLET_11_R), (0, 0))
            Line((0, 0), (FILLET_11_R, 0))
        make_face()
    extrude(amount=5)

    # 圆角12
    fillet_12_edges = [part.edges().sort_by_distance(p)[0] for p in [
        (-21.5, -1, -5),
        (-21.5, -11, -5),
        (21.5, -1, -5),
        (21.5, -11, -5),
    ]]
    fillet(fillet_12_edges, radius=FILLET_12_R)

    # 草图16 → 切除-拉伸8 (cut)
    with BuildSketch(Plane(origin=(0, 0, -10), x_dir=(-1, 0, 0), z_dir=(0, 0, -1))):
        with Locations((-28.316563479, -8.802542711)):
            Rectangle(SKETCH_16_W, SKETCH_16_H)
        with Locations((29.383780567, -7.118711305)):
            Rectangle(SKETCH_16_W_2, SKETCH_16_H_2)
    extrude(amount=-CUT_EXTRUDE_8_DEPTH, mode=Mode.SUBTRACT)


solid = part.part
